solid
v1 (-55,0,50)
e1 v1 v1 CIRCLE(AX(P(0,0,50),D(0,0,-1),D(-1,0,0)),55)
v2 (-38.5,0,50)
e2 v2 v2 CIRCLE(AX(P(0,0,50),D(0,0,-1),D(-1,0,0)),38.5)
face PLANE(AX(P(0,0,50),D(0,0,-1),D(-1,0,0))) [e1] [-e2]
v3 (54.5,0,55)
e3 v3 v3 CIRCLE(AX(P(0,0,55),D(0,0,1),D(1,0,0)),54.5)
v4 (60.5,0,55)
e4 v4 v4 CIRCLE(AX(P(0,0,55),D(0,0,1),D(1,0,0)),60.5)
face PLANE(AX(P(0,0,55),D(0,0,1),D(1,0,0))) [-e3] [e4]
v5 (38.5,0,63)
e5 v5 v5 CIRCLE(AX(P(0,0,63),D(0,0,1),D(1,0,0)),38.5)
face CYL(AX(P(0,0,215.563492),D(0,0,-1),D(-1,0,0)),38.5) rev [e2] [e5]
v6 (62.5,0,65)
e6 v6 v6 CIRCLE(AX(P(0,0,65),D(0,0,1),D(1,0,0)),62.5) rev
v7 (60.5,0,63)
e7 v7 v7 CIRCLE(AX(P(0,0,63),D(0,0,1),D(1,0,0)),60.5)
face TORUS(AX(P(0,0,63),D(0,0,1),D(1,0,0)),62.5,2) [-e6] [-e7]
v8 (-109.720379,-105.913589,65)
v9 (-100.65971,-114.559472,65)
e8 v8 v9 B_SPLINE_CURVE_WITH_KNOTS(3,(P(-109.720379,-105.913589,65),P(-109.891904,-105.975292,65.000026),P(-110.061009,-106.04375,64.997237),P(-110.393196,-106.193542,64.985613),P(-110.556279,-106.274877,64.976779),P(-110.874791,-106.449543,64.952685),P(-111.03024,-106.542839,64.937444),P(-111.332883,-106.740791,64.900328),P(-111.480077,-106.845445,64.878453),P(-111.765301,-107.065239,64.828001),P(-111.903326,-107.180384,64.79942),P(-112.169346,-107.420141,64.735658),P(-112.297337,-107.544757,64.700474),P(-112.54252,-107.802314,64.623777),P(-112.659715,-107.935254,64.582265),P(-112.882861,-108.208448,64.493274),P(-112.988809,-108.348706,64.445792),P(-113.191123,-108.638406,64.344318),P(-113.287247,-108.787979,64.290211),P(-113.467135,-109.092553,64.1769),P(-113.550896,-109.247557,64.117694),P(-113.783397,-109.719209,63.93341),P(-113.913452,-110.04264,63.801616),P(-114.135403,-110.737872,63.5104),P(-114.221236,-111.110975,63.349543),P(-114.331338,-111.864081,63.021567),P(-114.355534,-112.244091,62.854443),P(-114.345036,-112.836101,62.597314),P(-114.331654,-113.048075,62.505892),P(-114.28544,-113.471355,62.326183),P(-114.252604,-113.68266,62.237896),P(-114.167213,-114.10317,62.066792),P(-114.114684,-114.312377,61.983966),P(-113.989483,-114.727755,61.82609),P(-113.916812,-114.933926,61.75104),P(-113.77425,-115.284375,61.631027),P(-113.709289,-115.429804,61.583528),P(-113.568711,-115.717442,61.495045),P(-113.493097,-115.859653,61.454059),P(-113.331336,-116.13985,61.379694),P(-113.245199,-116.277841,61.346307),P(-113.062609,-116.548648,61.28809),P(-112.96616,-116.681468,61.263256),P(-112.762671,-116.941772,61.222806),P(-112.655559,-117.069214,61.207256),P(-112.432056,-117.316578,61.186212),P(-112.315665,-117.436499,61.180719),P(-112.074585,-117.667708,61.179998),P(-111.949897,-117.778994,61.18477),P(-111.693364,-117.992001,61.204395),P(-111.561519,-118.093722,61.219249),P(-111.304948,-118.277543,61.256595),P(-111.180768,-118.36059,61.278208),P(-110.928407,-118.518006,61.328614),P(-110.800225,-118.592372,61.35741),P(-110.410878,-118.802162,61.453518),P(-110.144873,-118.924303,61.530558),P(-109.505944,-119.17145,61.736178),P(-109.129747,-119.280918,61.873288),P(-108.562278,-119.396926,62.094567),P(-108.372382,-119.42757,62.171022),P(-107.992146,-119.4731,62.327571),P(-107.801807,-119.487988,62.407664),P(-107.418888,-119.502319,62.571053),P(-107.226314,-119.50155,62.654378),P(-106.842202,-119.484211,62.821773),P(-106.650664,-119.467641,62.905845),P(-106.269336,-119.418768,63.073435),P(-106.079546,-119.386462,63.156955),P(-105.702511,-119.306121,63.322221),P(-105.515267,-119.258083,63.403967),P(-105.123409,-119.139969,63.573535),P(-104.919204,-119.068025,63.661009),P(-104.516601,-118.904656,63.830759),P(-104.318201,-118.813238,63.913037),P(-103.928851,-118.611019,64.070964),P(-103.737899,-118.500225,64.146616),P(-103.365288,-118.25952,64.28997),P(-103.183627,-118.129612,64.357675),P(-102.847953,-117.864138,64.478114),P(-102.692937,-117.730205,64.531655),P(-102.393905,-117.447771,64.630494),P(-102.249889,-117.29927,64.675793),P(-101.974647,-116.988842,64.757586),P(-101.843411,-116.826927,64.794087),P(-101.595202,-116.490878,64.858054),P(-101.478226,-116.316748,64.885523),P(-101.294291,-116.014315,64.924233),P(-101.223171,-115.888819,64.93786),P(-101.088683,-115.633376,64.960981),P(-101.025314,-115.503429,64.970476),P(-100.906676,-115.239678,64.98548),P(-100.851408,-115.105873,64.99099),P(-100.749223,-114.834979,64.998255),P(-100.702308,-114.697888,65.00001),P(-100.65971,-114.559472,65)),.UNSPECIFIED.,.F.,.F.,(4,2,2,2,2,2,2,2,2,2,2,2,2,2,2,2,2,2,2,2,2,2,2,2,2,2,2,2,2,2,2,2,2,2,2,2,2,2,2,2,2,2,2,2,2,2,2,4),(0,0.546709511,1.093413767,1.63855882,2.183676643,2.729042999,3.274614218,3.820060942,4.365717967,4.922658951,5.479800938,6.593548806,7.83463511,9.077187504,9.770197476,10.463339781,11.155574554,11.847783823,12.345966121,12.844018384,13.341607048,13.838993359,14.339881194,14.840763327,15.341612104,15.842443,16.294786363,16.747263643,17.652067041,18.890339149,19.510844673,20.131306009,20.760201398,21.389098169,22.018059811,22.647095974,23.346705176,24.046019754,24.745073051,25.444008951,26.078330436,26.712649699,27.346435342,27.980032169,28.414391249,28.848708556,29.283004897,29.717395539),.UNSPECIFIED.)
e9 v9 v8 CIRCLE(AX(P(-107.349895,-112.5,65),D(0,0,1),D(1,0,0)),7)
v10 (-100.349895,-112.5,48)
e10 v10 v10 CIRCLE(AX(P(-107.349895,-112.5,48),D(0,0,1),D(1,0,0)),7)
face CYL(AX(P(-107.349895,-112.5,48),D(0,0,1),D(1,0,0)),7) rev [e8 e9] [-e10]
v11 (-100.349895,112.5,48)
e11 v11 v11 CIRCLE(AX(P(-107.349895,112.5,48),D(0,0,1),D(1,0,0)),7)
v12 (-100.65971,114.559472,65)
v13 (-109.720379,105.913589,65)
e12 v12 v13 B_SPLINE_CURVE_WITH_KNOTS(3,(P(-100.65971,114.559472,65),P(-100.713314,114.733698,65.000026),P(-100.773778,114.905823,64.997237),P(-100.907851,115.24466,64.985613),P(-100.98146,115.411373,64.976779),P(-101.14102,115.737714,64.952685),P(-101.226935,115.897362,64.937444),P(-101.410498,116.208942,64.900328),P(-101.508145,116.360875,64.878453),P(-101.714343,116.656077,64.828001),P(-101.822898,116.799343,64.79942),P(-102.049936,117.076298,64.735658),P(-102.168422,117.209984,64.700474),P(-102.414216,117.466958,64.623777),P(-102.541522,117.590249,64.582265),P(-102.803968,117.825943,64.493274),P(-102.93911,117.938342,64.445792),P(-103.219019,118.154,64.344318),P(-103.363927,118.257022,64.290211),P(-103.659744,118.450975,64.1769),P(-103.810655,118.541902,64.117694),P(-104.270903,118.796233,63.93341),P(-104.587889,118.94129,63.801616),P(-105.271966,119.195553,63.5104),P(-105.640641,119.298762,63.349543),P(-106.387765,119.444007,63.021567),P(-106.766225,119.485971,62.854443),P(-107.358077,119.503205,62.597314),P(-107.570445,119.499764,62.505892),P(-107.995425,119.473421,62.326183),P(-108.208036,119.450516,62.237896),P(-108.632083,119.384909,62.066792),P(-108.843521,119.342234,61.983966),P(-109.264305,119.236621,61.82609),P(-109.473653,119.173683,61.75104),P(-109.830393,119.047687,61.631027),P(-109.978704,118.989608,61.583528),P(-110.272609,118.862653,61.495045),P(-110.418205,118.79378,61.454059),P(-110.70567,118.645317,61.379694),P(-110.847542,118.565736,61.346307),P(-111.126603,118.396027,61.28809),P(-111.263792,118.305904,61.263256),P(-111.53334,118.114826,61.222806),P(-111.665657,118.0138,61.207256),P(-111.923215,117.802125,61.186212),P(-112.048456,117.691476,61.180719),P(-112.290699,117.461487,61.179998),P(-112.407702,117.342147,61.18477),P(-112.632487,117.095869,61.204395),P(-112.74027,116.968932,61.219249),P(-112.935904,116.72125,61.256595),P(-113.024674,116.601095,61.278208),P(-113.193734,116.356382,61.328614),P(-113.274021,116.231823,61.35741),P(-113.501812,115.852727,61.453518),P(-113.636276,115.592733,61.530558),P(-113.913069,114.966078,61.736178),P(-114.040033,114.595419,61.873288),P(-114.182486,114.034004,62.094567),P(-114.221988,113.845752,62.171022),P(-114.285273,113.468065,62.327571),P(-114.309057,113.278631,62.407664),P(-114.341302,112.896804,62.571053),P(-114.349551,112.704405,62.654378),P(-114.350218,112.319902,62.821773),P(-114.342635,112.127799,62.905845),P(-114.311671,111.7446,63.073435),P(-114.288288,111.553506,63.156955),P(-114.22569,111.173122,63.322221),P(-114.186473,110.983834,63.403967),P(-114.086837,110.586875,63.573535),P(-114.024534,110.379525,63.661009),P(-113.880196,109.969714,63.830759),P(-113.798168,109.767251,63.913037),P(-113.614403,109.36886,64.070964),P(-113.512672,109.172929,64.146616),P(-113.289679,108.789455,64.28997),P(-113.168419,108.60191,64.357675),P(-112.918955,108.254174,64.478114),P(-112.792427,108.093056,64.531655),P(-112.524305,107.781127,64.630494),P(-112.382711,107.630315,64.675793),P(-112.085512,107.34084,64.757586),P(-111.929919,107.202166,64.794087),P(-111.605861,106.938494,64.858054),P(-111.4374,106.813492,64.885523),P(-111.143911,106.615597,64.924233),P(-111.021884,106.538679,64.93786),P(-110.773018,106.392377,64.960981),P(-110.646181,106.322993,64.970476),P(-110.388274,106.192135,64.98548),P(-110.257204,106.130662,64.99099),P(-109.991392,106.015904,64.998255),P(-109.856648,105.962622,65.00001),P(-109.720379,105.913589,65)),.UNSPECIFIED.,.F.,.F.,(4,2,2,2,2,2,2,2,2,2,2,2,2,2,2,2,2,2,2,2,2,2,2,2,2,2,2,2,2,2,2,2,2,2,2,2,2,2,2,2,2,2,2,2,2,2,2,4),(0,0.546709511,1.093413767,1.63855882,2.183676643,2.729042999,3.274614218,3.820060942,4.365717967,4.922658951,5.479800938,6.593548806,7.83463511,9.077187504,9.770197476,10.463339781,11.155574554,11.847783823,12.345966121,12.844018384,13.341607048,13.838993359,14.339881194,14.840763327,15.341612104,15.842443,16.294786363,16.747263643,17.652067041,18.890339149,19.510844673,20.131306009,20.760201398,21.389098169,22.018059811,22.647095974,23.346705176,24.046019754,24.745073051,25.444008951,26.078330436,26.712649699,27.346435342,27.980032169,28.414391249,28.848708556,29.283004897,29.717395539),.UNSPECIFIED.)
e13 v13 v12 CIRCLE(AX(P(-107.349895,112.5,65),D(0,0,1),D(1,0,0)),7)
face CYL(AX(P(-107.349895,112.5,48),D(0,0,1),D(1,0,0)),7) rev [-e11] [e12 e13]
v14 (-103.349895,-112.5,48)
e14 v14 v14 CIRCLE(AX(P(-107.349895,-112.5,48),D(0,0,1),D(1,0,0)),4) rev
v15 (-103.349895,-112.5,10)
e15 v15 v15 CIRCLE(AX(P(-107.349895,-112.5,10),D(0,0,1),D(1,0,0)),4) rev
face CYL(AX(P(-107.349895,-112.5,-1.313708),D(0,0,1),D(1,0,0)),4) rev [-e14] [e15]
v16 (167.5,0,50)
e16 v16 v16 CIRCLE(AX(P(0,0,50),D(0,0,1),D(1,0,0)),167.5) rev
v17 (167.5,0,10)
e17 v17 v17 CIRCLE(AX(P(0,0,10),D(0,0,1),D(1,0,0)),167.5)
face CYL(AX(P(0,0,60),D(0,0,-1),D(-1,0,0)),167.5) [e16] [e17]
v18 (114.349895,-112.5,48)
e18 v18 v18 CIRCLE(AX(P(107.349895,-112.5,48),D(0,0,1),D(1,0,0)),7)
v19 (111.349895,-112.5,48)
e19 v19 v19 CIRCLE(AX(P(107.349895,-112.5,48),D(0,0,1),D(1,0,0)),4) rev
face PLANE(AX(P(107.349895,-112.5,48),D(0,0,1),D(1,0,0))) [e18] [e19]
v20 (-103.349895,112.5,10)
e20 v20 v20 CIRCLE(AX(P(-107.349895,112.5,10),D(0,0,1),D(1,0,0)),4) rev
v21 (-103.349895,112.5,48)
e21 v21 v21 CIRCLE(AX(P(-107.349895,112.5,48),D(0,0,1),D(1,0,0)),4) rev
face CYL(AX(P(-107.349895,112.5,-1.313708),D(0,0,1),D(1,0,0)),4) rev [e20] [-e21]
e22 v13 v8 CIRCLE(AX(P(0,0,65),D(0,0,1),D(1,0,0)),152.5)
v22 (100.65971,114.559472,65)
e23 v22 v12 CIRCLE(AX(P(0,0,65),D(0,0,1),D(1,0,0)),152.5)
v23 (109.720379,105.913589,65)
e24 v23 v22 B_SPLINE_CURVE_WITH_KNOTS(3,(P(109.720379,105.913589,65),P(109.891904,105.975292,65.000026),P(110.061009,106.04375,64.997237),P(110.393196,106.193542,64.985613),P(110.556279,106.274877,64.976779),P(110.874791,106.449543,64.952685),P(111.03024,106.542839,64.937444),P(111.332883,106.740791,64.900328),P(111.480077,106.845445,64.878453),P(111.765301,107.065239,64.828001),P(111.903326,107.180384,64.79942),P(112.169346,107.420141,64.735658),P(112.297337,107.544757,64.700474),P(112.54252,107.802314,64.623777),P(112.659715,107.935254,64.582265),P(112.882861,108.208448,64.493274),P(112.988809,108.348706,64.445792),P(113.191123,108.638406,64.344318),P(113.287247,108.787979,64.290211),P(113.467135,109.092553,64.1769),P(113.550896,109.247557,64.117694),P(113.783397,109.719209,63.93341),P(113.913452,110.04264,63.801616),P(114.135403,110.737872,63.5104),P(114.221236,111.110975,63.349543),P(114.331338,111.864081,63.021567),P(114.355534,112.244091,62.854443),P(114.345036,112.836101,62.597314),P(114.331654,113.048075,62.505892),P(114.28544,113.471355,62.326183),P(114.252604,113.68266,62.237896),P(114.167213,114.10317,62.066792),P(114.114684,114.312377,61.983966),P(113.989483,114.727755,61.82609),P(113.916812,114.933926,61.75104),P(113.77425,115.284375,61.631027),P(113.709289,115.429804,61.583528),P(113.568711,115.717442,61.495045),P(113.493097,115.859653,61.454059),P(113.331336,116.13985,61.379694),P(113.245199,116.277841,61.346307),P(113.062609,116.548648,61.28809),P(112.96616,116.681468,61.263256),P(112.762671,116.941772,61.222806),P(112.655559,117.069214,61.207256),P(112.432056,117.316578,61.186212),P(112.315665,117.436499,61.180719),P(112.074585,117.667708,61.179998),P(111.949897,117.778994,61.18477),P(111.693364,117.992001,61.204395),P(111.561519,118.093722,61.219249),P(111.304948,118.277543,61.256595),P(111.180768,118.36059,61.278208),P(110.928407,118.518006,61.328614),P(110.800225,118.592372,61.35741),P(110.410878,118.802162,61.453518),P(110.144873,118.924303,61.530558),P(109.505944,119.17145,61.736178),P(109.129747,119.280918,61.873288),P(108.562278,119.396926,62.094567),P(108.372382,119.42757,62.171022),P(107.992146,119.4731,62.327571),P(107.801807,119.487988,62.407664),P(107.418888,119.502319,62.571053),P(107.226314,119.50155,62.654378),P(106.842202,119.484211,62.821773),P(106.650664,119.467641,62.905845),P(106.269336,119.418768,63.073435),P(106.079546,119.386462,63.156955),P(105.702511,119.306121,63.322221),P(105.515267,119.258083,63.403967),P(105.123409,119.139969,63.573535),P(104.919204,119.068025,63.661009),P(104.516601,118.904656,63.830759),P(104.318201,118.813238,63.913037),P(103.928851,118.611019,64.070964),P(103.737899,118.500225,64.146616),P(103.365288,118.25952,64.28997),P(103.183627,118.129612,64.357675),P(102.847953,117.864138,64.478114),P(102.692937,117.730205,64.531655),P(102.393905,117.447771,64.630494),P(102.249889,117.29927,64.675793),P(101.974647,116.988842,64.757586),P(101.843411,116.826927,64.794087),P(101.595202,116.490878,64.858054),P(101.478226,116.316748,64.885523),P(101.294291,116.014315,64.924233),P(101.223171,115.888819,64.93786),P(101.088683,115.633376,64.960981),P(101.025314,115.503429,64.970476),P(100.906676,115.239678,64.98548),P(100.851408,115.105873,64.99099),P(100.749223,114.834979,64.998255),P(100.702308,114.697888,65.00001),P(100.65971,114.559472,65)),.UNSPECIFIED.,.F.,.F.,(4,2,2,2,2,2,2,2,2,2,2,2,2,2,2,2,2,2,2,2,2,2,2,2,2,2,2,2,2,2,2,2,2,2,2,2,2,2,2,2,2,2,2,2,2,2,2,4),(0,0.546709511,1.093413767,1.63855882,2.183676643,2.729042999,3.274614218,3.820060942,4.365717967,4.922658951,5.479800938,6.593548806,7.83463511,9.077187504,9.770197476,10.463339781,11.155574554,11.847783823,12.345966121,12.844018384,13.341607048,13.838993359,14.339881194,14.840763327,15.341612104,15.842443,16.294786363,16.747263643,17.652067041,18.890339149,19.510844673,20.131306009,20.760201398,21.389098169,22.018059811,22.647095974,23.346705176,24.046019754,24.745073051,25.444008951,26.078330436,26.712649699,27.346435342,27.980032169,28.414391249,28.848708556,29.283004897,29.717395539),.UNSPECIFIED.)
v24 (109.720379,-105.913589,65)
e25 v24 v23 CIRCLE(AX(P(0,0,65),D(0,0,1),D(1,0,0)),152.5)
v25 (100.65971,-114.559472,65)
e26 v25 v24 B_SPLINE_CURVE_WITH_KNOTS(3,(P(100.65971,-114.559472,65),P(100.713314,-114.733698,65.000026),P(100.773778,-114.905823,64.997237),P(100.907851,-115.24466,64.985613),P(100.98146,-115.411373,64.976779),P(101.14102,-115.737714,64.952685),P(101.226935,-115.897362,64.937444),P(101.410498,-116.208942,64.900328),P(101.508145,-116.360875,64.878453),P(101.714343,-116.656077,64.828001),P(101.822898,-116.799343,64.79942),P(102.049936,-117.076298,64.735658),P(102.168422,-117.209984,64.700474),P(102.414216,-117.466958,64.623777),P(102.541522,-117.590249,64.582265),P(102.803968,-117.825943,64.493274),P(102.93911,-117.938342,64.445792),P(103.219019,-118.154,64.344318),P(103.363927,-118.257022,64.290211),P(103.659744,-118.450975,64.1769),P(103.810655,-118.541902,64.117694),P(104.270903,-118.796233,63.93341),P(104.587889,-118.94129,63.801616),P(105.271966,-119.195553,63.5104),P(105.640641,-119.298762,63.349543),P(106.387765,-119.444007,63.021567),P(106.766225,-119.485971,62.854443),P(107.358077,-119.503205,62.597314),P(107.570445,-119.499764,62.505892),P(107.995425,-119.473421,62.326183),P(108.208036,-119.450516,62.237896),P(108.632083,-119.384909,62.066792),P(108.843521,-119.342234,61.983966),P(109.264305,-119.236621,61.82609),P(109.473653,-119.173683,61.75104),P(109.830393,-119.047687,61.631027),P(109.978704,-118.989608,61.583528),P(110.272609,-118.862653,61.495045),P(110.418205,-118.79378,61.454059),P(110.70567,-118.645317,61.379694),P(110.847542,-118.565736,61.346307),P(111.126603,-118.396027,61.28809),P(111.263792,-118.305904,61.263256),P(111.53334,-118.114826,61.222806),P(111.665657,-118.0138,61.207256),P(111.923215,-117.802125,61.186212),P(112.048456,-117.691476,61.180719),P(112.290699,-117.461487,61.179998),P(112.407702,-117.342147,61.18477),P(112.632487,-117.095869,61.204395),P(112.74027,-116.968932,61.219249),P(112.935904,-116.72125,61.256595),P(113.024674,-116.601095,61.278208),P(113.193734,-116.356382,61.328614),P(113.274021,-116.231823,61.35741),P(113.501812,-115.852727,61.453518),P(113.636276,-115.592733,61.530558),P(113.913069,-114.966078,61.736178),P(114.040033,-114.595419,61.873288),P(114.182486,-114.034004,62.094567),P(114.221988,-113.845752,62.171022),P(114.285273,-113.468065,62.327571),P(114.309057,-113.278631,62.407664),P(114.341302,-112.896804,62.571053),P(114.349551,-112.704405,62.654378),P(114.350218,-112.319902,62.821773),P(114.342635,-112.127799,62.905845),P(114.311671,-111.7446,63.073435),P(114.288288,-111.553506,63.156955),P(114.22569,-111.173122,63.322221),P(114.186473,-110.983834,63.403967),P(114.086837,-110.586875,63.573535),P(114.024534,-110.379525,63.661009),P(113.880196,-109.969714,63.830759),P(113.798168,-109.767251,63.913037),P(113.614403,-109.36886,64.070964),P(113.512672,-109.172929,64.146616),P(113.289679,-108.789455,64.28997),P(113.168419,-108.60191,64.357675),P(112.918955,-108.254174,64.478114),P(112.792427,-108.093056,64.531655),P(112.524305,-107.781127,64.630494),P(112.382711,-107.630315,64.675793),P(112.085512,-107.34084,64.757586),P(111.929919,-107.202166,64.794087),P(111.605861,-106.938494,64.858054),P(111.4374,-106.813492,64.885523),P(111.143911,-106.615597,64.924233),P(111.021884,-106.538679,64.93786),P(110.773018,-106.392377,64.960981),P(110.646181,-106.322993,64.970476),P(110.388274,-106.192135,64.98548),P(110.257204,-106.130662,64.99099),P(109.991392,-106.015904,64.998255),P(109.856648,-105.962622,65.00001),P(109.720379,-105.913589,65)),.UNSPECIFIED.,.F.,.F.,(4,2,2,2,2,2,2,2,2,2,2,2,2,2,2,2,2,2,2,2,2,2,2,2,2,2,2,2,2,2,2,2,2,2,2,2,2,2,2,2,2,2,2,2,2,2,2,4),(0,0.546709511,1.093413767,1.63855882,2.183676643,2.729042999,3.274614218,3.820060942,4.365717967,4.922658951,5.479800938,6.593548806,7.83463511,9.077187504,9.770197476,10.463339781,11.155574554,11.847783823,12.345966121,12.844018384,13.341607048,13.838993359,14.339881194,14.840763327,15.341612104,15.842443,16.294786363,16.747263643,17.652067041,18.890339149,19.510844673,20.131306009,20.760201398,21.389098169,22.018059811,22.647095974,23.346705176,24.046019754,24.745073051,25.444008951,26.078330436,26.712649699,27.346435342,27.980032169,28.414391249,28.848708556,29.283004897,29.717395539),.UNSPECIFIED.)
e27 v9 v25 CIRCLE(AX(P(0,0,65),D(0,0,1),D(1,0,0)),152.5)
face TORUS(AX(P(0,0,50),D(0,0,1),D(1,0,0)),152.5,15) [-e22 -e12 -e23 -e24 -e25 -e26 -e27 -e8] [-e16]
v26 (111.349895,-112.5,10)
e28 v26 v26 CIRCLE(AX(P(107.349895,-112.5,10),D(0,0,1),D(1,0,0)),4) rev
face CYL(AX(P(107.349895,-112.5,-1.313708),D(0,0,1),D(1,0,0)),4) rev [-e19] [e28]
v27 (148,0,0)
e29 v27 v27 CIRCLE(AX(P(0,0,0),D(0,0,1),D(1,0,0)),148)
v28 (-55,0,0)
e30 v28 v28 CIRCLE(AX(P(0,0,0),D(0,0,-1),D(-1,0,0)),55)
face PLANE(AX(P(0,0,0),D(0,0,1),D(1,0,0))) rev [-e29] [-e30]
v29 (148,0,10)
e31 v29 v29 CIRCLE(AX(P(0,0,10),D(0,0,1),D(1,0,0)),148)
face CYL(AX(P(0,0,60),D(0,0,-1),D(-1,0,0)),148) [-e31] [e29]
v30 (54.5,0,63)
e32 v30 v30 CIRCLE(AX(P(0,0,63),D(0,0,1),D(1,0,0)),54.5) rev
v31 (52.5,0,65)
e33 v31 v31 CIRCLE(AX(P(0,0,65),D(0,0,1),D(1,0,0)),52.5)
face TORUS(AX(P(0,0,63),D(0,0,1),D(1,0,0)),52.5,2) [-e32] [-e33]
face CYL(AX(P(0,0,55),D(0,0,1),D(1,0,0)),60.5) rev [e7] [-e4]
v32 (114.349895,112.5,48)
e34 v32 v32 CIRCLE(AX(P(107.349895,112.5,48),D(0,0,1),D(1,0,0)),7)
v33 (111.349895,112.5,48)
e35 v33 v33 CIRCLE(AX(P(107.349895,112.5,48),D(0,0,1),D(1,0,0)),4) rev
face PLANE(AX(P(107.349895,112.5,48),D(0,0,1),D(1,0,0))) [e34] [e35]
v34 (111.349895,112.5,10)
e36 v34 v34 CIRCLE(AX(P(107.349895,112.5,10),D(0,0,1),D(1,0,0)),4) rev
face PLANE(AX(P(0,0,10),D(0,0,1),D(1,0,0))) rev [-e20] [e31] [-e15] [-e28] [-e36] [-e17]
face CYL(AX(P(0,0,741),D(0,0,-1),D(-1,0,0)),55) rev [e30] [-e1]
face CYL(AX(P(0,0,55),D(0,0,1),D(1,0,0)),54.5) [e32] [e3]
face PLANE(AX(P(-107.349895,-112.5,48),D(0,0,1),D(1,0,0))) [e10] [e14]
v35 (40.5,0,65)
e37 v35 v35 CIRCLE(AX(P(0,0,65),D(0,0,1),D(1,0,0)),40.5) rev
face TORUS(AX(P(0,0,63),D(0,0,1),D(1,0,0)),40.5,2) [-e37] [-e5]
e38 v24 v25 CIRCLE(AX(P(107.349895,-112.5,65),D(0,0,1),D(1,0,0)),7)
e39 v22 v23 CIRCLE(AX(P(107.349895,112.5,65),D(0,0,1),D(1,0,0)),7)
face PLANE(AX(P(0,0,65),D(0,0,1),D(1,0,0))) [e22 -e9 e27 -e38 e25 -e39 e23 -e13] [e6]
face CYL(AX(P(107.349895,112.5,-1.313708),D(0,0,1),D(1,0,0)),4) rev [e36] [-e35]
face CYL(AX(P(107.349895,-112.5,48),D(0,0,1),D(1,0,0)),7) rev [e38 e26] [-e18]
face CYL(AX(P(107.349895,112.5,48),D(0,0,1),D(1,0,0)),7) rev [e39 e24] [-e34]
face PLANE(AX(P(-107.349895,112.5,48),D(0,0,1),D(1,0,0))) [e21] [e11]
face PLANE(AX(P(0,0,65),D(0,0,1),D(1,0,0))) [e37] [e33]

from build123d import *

# Parameters (mm, degrees)
IZIM1_R                     = 148
Y_KSEKLIK_EKSTR_ZYON1_DEPTH = 60
Y_KSEKLIK_EKSTR_ZYON2_START = 10
IZIM2_R                     = 167.5
Y_KSEKLIK_EKSTR_ZYON2_DEPTH = 50
IZIM3_R                     = 55
KES_EKSTR_ZYON1_DEPTH       = 741
Y_KSEKLIK_EKSTR_ZYON3_START = -50
IZIM4_R                     = 55
IZIM4_R_2                   = 38.5
Y_KSEKLIK_EKSTR_ZYON3_DEPTH = 10
IZIM5_R                     = 167.5
IZIM5_R_2                   = 38.5
Y_KSEKLIK_EKSTR_ZYON4_DEPTH = 5
IZIM6_R                     = 60.5
IZIM6_R_2                   = 54.5
KES_EKSTR_ZYON2_DEPTH       = 10
IZIM7_R                     = 4
KES_EKSTR_ZYON3_DEPTH       = 55
IZIM8_R                     = 7
KES_EKSTR_ZYON4_DEPTH       = 17
RADYUS1_R                   = 15
RADYUS2_R                   = 2


with BuildPart() as part:
    # Çizim1 → Yükseklik-Ekstrüzyon1 (new body)
    with BuildSketch(Plane.XY):
        Circle(IZIM1_R)
    extrude(amount=Y_KSEKLIK_EKSTR_ZYON1_DEPTH)

    # Çizim2 → Yükseklik-Ekstrüzyon2 (add)
    with BuildSketch(Plane.XY.offset(Y_KSEKLIK_EKSTR_ZYON2_START)):
        Circle(IZIM2_R)
    extrude(amount=Y_KSEKLIK_EKSTR_ZYON2_DEPTH)

    # Çizim3 → Kes-Ekstrüzyon1 (cut)
    with BuildSketch(Plane(origin=(0, 0, 0), x_dir=(-1, 0, 0), z_dir=(0, 0, -1))):
        Circle(IZIM3_R)
    extrude(amount=-KES_EKSTR_ZYON1_DEPTH, mode=Mode.SUBTRACT)

    # Çizim4 → Yükseklik-Ekstrüzyon3 (add)
    with BuildSketch(Plane(origin=(0, 0, 0), x_dir=(-1, 0, 0), z_dir=(0, 0, -1)).offset(Y_KSEKLIK_EKSTR_ZYON3_START)):
        Circle(IZIM4_R)
        Circle(IZIM4_R_2, mode=Mode.SUBTRACT)
    extrude(amount=-Y_KSEKLIK_EKSTR_ZYON3_DEPTH)

    # Çizim5 → Yükseklik-Ekstrüzyon4 (add)
    with BuildSketch(Plane.XY.offset(60)):
        Circle(IZIM5_R)
        with Locations(Location((0, 0, 0), (0, 0, 180))):
            Circle(IZIM5_R_2, mode=Mode.SUBTRACT)
    extrude(amount=Y_KSEKLIK_EKSTR_ZYON4_DEPTH)

    # Çizim6 → Kes-Ekstrüzyon2 (cut)
    with BuildSketch(Plane.XY.offset(65)):
        Circle(IZIM6_R)
        Circle(IZIM6_R_2, mode=Mode.SUBTRACT)
    extrude(amount=-KES_EKSTR_ZYON2_DEPTH, mode=Mode.SUBTRACT)

    # Çizim7 → Kes-Ekstrüzyon3 (cut)
    with BuildSketch(Plane.XY.offset(65)):
        with Locations((-107.349895203, 112.5)):
            Circle(IZIM7_R)
        with Locations((107.349895203, 112.5)):
            Circle(IZIM7_R)
        with Locations((107.349895203, -112.5)):
            Circle(IZIM7_R)
        with Locations((-107.349895203, -112.5)):
            Circle(IZIM7_R)
    extrude(amount=-KES_EKSTR_ZYON3_DEPTH, mode=Mode.SUBTRACT)

    # Çizim8 → Kes-Ekstrüzyon4 (cut)
    with BuildSketch(Plane.XY.offset(65)):
        with Locations((-107.349895203, 112.5)):
            Circle(IZIM8_R)
        with Locations((107.349895203, 112.5)):
            Circle(IZIM8_R)
        with Locations((107.349895203, -112.5)):
            Circle(IZIM8_R)
        with Locations((-107.349895203, -112.5)):
            Circle(IZIM8_R)
    extrude(amount=-KES_EKSTR_ZYON4_DEPTH, mode=Mode.SUBTRACT)

    # Radyus1
    # the kernel refuses this fillet: 15 mm, written as the material it takes off along each edge
    with BuildSketch(Plane(origin=(0, 0, 65), x_dir=(1, 0, 0), z_dir=(0, -1, 0))) as radyus1_piece_1:
        with BuildLine():
            CenterArc((167.5 - RADYUS1_R, -RADYUS1_R), RADYUS1_R, 0, 90)
            Line((167.5 - RADYUS1_R, 0), (167.5, 0))
            Line((167.5, 0), (167.5, -RADYUS1_R))
        make_face()
    revolve(axis=Axis((0, 0, 65), (0, 0, 1)), mode=Mode.SUBTRACT)

    # Radyus2
    radyus2_edges = [part.edges().sort_by_distance(p)[0] for p in [
        (38.5, 0, 65),
        (-60.5, 0, 65),
        (-54.5, 0, 65),
    ]]
    fillet(radyus2_edges, radius=RADYUS2_R)


solid = part.part
